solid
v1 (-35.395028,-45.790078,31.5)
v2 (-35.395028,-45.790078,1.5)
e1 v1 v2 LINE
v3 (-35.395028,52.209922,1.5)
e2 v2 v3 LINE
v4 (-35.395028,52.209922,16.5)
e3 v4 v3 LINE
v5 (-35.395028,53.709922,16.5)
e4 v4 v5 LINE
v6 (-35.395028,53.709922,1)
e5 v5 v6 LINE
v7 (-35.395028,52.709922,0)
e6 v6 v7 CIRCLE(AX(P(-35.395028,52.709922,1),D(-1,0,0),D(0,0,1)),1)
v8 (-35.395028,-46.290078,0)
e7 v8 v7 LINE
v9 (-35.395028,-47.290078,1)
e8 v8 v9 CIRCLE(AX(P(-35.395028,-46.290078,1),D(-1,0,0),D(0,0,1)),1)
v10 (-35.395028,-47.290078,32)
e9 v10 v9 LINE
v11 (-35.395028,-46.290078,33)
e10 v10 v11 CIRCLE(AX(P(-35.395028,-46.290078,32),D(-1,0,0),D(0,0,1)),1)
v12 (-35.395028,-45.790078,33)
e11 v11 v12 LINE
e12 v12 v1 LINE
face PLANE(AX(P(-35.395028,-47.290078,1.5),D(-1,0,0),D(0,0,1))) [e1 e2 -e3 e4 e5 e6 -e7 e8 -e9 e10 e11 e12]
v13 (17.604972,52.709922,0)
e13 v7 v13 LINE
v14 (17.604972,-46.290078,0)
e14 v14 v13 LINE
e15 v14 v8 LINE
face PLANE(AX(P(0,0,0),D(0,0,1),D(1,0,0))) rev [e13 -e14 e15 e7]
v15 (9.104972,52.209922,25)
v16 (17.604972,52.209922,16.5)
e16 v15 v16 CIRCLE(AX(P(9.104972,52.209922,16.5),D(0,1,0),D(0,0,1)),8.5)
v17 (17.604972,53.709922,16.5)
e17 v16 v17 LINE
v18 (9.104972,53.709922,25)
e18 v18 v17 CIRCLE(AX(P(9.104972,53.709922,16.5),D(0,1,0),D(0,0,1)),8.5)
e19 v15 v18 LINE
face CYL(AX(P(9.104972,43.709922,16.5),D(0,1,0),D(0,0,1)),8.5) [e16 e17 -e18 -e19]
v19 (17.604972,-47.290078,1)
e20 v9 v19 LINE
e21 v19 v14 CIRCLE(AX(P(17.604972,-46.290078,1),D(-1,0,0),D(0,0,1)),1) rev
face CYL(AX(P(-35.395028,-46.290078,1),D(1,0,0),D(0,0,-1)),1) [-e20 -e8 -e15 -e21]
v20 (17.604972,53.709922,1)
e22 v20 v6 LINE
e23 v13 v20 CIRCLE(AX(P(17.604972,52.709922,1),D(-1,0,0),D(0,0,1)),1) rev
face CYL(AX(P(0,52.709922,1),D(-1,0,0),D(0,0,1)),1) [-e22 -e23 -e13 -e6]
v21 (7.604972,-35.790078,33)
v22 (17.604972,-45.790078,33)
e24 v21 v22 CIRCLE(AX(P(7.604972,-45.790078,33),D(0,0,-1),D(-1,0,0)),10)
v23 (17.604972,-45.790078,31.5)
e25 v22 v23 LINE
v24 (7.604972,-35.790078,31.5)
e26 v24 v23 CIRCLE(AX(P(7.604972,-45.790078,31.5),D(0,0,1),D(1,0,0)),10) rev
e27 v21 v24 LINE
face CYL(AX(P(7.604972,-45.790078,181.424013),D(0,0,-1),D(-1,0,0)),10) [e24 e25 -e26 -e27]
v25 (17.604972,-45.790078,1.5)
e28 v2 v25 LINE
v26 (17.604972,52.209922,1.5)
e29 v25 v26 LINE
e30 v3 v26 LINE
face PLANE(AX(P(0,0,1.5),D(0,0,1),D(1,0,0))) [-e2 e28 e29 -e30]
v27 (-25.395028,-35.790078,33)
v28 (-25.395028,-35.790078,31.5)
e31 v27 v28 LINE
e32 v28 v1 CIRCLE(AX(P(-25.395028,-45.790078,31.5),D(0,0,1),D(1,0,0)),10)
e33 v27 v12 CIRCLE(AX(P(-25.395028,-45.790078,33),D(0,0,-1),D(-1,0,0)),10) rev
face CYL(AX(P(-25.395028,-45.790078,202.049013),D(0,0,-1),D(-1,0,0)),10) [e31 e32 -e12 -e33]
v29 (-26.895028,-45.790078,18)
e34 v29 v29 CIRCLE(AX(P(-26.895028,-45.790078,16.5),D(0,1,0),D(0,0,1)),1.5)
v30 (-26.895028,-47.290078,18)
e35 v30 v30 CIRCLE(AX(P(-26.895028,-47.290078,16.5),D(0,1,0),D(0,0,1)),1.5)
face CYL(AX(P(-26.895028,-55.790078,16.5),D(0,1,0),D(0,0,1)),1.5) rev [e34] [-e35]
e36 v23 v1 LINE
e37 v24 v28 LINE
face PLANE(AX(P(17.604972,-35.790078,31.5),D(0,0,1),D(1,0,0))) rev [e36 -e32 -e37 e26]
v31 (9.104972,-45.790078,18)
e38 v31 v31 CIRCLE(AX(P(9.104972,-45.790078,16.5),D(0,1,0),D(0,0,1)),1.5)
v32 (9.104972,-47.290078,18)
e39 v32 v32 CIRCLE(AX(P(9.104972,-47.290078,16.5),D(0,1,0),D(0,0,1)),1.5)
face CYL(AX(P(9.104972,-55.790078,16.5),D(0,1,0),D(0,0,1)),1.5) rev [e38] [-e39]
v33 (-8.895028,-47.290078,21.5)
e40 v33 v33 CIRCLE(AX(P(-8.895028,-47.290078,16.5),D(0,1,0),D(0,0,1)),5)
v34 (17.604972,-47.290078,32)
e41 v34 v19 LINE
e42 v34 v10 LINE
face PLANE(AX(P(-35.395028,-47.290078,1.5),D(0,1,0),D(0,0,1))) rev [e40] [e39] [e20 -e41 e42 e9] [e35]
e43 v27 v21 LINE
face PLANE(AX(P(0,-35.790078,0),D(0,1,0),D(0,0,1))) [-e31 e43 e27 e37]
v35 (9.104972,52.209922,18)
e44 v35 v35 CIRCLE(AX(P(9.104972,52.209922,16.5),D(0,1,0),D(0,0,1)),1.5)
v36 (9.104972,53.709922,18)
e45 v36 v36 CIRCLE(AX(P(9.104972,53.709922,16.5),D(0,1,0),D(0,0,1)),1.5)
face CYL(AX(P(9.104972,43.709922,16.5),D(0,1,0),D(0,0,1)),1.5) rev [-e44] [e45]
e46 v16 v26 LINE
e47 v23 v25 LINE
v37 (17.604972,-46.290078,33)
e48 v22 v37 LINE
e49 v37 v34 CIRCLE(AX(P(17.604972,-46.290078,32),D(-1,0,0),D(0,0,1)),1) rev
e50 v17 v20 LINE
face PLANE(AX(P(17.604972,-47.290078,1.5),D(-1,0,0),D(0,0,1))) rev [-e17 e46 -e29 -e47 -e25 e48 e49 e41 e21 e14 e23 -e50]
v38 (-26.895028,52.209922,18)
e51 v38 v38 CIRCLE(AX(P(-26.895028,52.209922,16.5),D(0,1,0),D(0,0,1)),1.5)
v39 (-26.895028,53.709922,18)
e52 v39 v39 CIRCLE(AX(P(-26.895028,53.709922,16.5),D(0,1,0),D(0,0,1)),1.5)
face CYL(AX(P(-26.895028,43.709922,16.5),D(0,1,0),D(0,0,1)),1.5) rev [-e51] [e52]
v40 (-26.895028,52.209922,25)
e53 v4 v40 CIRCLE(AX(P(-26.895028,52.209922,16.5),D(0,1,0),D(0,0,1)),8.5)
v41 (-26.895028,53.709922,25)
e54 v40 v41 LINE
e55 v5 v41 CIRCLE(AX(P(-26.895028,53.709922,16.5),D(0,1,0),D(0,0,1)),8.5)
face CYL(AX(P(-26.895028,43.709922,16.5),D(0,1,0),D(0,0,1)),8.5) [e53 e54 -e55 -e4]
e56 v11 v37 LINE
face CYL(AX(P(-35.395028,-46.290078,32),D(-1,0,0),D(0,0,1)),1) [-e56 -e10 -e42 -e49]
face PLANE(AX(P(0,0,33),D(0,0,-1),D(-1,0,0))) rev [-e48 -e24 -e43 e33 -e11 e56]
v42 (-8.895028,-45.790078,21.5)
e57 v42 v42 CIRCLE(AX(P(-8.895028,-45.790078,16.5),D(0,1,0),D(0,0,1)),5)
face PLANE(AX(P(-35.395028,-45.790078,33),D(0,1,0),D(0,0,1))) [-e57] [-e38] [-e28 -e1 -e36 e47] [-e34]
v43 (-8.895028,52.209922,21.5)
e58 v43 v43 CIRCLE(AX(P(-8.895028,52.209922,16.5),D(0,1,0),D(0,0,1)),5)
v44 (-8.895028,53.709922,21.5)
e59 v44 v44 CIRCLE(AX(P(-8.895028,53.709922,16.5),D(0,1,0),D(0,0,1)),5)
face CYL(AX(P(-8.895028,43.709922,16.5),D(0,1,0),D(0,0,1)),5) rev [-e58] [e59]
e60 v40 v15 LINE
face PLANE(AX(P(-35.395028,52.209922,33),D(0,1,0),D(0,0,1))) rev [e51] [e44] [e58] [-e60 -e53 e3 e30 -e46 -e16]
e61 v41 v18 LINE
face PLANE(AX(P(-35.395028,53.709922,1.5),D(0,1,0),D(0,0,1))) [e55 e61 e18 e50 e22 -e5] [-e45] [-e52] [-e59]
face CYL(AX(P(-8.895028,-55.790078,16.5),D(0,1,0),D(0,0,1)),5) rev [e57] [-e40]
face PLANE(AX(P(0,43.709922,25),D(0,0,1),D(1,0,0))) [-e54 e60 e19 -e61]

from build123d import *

# Parameters (mm, degrees)
SKETCH1_W               = 53
SKETCH1_H               = 101
BOSS_EXTRUDE1_DEPTH     = 1.5
SKETCH5_W               = 53
SKETCH5_H               = 1.5
BOSS_EXTRUDE2_DEPTH     = 31.5
SKETCH3_W               = 53
SKETCH3_H               = 1.5
EXTRUDE_THIN3_DEPTH     = 31.5
SKETCH6_W               = 53
SKETCH6_H               = 1.5
BOSS_EXTRUDE3_DEPTH     = 10
CUT_EXTRUDE3_DEPTH      = 10
FILLET1_R               = 1
CUT_EXTRUDE4_DEPTH      = 10
FILLET2_R               = 1
FILLET3_R               = 1
CUT_EXTRUDE5_DEPTH      = 10
CUT_EXTRUDE6_DEPTH      = 73.29497691
CUT_EXTRUDE6_DEPTH_BACK = 10
CUT_EXTRUDE8_START      = -1.5
CUT_EXTRUDE8_DEPTH      = 1.5


# Read off the part's stored shape, not the designer's step: Cut-Extrude8
with BuildPart() as part:
    # Sketch1 → Boss-Extrude1 (new body)
    with BuildSketch(Plane.XY):
        with Locations((-8.895027996, 3.209921613)):
            Rectangle(SKETCH1_W, SKETCH1_H)
    extrude(amount=BOSS_EXTRUDE1_DEPTH)

    # Sketch5 → Boss-Extrude2 (add)
    with BuildSketch(Plane.XY.offset(1.5)):
        with Locations((-8.895027996, 52.959921613)):
            Rectangle(SKETCH5_W, SKETCH5_H)
    extrude(amount=BOSS_EXTRUDE2_DEPTH)

    # Sketch3 → Extrude-Thin3 (add)
    with BuildSketch(Plane.XY.offset(1.5)):
        with Locations((-8.895027996, -46.540078387)):
            Rectangle(SKETCH3_W, SKETCH3_H)
    extrude(amount=EXTRUDE_THIN3_DEPTH)

    # Sketch6 → Boss-Extrude3 (add)
    with BuildSketch(Plane(origin=(0, -45.790078387, 0), x_dir=(1, 0, 0), z_dir=(0, 1, 0))):
        with Locations((-8.895027996, -32.25)):
            Rectangle(SKETCH6_W, SKETCH6_H)
    extrude(amount=BOSS_EXTRUDE3_DEPTH)

    # Sketch7 → Cut-Extrude3 (cut)
    with BuildSketch(Plane(origin=(0, 53.709921613, 0), x_dir=(1, 0, 0), z_dir=(0, 1, 0))):
        with BuildLine():
            ThreePointArc((-3.895027996, -16.5), (-7.520695926, -11.692587873), (-13.13951254, -13.857207736))
            Line((-13.13951254, -13.857207736), (-8.895027996, -16.5))
            Line((-8.895027996, -16.5), (-3.895027996, -16.5))
        make_face()
        with BuildLine():
            Line((-8.895027996, -16.5), (-13.13951254, -13.857207736))
            ThreePointArc((-13.13951254, -13.857207736), (-13.702440123, -15.12566793), (-13.895027996, -16.5))
            Line((-13.895027996, -16.5), (-8.895027996, -16.5))
        make_face()
        with BuildLine():
            Line((-3.895027996, -16.5), (-8.895027996, -16.5))
            Line((-8.895027996, -16.5), (-4.650543451, -19.142792264))
            ThreePointArc((-4.650543451, -19.142792264), (-4.087615868, -17.87433207), (-3.895027996, -16.5))
        make_face()
        with BuildLine():
            Line((-4.650543451, -19.142792264), (-8.895027996, -16.5))
            Line((-8.895027996, -16.5), (-13.895027996, -16.5))
            ThreePointArc((-13.895027996, -16.5), (-10.269360065, -21.307412127), (-4.650543451, -19.142792264))
        make_face()
        with BuildLine():
            ThreePointArc((10.604972004, -16.5), (9.104972004, -15), (7.604972004, -16.5))
            Line((7.604972004, -16.5), (10.604972004, -16.5))
        make_face()
        with BuildLine():
            Line((10.604972004, -16.5), (7.604972004, -16.5))
            ThreePointArc((7.604972004, -16.5), (9.104972004, -18), (10.604972004, -16.5))
        make_face()
        with BuildLine():
            ThreePointArc((-28.395027996, -16.5), (-26.895027996, -18), (-25.395027996, -16.5))
            Line((-25.395027996, -16.5), (-28.395027996, -16.5))
        make_face()
        with BuildLine():
            Line((-28.395027996, -16.5), (-25.395027996, -16.5))
            ThreePointArc((-25.395027996, -16.5), (-26.895027996, -15), (-28.395027996, -16.5))
        make_face()
    extrude(amount=-CUT_EXTRUDE3_DEPTH, mode=Mode.SUBTRACT)

    # Fillet1
    fillet1_edges = [part.edges().sort_by_distance(p)[0] for p in [
        (-8.895027996, 53.709921613, 0),
    ]]
    fillet(fillet1_edges, radius=FILLET1_R)

    # Sketch8 → Cut-Extrude4 (cut)
    with BuildSketch(Plane(origin=(0, -45.790078387, 0), x_dir=(1, 0, 0), z_dir=(0, 1, 0))):
        with BuildLine():
            ThreePointArc((-3.895027996, -16.5), (-7.621533075, -11.664898068), (-13.246312271, -14.037008901))
            Line((-13.246312271, -14.037008901), (-8.895027996, -16.5))
            Line((-8.895027996, -16.5), (-3.895027996, -16.5))
        make_face()
        with BuildLine():
            Line((-8.895027996, -16.5), (-13.246312271, -14.037008901))
            ThreePointArc((-13.246312271, -14.037008901), (-13.730129927, -15.22650508), (-13.895027996, -16.5))
            Line((-13.895027996, -16.5), (-8.895027996, -16.5))
        make_face()
        with BuildLine():
            Line((-3.895027996, -16.5), (-8.895027996, -16.5))
            Line((-8.895027996, -16.5), (-4.54374372, -18.962991099))
            ThreePointArc((-4.54374372, -18.962991099), (-4.059926064, -17.77349492), (-3.895027996, -16.5))
        make_face()
        with BuildLine():
            Line((-4.54374372, -18.962991099), (-8.895027996, -16.5))
            Line((-8.895027996, -16.5), (-13.895027996, -16.5))
            ThreePointArc((-13.895027996, -16.5), (-10.168522916, -21.335101932), (-4.54374372, -18.962991099))
        make_face()
        with BuildLine():
            ThreePointArc((-28.395027996, -16.5), (-26.895027996, -18), (-25.395027996, -16.5))
            Line((-25.395027996, -16.5), (-28.395027996, -16.5))
        make_face()
        with BuildLine():
            Line((-28.395027996, -16.5), (-25.395027996, -16.5))
            ThreePointArc((-25.395027996, -16.5), (-26.895027996, -15), (-28.395027996, -16.5))
        make_face()
        with BuildLine():
            ThreePointArc((10.604972004, -16.5), (9.104972004, -15), (7.604972004, -16.5))
            Line((7.604972004, -16.5), (10.604972004, -16.5))
        make_face()
        with BuildLine():
            Line((10.604972004, -16.5), (7.604972004, -16.5))
            ThreePointArc((7.604972004, -16.5), (9.104972004, -18), (10.604972004, -16.5))
        make_face()
    extrude(amount=-CUT_EXTRUDE4_DEPTH, mode=Mode.SUBTRACT)

    # Fillet2
    fillet2_edges = [part.edges().sort_by_distance(p)[0] for p in [
        (-8.895027996, -47.290078387, 0),
    ]]
    fillet(fillet2_edges, radius=FILLET2_R)

    # Fillet3
    fillet3_edges = [part.edges().sort_by_distance(p)[0] for p in [
        (-8.895027996, -47.290078387, 33),
    ]]
    fillet(fillet3_edges, radius=FILLET3_R)

    # Sketch10 → Cut-Extrude5 (cut)
    with BuildSketch(Plane(origin=(0, 53.709921613, 0), x_dir=(1, 0, 0), z_dir=(0, 1, 0))):
        with BuildLine():
            Line((9.104972004, -25), (-26.895027996, -25))
            ThreePointArc((-26.895027996, -25), (-32.905435636, -22.51040764), (-35.395027996, -16.5))
            Line((-35.395027996, -16.5), (-35.395027996, -33))
            Line((-35.395027996, -33), (17.604972004, -33))
            Line((17.604972004, -33), (17.604972004, -16.5))
            ThreePointArc((17.604972004, -16.5), (15.115379645, -22.51040764), (9.104972004, -25))
        make_face()
    extrude(amount=-CUT_EXTRUDE5_DEPTH, mode=Mode.SUBTRACT)

    # Sketch11 → Cut-Extrude6 (cut, two sides: drawn at the far end of the back side and taken through both)
    with BuildSketch(Plane.XY.offset(33).offset(-CUT_EXTRUDE6_DEPTH_BACK)):
        with BuildLine():
            Line((-35.395027996, -35.790078387), (-35.395027996, -45.790078387))
            ThreePointArc((-35.395027996, -45.790078387), (-32.466095807, -38.719010576), (-25.395027996, -35.790078387))
            Line((-25.395027996, -35.790078387), (-35.395027996, -35.790078387))
        make_face()
    extrude(amount=CUT_EXTRUDE6_DEPTH + CUT_EXTRUDE6_DEPTH_BACK, mode=Mode.SUBTRACT)

    # Cut-Extrude8 outline → Cut-Extrude8 (cut)
    with BuildSketch(Plane.XY.offset(33).offset(CUT_EXTRUDE8_START)):
        with BuildLine():
            Line((17.604972004, -35.790078387), (7.604972004, -35.790078387))
            ThreePointArc((7.604972004, -35.790078387), (14.676039815, -38.719010576), (17.604972004, -45.790078387))
            Line((17.604972004, -45.790078387), (17.604972004, -35.790078387))
        make_face()
    extrude(amount=CUT_EXTRUDE8_DEPTH, mode=Mode.SUBTRACT)


solid = part.part
